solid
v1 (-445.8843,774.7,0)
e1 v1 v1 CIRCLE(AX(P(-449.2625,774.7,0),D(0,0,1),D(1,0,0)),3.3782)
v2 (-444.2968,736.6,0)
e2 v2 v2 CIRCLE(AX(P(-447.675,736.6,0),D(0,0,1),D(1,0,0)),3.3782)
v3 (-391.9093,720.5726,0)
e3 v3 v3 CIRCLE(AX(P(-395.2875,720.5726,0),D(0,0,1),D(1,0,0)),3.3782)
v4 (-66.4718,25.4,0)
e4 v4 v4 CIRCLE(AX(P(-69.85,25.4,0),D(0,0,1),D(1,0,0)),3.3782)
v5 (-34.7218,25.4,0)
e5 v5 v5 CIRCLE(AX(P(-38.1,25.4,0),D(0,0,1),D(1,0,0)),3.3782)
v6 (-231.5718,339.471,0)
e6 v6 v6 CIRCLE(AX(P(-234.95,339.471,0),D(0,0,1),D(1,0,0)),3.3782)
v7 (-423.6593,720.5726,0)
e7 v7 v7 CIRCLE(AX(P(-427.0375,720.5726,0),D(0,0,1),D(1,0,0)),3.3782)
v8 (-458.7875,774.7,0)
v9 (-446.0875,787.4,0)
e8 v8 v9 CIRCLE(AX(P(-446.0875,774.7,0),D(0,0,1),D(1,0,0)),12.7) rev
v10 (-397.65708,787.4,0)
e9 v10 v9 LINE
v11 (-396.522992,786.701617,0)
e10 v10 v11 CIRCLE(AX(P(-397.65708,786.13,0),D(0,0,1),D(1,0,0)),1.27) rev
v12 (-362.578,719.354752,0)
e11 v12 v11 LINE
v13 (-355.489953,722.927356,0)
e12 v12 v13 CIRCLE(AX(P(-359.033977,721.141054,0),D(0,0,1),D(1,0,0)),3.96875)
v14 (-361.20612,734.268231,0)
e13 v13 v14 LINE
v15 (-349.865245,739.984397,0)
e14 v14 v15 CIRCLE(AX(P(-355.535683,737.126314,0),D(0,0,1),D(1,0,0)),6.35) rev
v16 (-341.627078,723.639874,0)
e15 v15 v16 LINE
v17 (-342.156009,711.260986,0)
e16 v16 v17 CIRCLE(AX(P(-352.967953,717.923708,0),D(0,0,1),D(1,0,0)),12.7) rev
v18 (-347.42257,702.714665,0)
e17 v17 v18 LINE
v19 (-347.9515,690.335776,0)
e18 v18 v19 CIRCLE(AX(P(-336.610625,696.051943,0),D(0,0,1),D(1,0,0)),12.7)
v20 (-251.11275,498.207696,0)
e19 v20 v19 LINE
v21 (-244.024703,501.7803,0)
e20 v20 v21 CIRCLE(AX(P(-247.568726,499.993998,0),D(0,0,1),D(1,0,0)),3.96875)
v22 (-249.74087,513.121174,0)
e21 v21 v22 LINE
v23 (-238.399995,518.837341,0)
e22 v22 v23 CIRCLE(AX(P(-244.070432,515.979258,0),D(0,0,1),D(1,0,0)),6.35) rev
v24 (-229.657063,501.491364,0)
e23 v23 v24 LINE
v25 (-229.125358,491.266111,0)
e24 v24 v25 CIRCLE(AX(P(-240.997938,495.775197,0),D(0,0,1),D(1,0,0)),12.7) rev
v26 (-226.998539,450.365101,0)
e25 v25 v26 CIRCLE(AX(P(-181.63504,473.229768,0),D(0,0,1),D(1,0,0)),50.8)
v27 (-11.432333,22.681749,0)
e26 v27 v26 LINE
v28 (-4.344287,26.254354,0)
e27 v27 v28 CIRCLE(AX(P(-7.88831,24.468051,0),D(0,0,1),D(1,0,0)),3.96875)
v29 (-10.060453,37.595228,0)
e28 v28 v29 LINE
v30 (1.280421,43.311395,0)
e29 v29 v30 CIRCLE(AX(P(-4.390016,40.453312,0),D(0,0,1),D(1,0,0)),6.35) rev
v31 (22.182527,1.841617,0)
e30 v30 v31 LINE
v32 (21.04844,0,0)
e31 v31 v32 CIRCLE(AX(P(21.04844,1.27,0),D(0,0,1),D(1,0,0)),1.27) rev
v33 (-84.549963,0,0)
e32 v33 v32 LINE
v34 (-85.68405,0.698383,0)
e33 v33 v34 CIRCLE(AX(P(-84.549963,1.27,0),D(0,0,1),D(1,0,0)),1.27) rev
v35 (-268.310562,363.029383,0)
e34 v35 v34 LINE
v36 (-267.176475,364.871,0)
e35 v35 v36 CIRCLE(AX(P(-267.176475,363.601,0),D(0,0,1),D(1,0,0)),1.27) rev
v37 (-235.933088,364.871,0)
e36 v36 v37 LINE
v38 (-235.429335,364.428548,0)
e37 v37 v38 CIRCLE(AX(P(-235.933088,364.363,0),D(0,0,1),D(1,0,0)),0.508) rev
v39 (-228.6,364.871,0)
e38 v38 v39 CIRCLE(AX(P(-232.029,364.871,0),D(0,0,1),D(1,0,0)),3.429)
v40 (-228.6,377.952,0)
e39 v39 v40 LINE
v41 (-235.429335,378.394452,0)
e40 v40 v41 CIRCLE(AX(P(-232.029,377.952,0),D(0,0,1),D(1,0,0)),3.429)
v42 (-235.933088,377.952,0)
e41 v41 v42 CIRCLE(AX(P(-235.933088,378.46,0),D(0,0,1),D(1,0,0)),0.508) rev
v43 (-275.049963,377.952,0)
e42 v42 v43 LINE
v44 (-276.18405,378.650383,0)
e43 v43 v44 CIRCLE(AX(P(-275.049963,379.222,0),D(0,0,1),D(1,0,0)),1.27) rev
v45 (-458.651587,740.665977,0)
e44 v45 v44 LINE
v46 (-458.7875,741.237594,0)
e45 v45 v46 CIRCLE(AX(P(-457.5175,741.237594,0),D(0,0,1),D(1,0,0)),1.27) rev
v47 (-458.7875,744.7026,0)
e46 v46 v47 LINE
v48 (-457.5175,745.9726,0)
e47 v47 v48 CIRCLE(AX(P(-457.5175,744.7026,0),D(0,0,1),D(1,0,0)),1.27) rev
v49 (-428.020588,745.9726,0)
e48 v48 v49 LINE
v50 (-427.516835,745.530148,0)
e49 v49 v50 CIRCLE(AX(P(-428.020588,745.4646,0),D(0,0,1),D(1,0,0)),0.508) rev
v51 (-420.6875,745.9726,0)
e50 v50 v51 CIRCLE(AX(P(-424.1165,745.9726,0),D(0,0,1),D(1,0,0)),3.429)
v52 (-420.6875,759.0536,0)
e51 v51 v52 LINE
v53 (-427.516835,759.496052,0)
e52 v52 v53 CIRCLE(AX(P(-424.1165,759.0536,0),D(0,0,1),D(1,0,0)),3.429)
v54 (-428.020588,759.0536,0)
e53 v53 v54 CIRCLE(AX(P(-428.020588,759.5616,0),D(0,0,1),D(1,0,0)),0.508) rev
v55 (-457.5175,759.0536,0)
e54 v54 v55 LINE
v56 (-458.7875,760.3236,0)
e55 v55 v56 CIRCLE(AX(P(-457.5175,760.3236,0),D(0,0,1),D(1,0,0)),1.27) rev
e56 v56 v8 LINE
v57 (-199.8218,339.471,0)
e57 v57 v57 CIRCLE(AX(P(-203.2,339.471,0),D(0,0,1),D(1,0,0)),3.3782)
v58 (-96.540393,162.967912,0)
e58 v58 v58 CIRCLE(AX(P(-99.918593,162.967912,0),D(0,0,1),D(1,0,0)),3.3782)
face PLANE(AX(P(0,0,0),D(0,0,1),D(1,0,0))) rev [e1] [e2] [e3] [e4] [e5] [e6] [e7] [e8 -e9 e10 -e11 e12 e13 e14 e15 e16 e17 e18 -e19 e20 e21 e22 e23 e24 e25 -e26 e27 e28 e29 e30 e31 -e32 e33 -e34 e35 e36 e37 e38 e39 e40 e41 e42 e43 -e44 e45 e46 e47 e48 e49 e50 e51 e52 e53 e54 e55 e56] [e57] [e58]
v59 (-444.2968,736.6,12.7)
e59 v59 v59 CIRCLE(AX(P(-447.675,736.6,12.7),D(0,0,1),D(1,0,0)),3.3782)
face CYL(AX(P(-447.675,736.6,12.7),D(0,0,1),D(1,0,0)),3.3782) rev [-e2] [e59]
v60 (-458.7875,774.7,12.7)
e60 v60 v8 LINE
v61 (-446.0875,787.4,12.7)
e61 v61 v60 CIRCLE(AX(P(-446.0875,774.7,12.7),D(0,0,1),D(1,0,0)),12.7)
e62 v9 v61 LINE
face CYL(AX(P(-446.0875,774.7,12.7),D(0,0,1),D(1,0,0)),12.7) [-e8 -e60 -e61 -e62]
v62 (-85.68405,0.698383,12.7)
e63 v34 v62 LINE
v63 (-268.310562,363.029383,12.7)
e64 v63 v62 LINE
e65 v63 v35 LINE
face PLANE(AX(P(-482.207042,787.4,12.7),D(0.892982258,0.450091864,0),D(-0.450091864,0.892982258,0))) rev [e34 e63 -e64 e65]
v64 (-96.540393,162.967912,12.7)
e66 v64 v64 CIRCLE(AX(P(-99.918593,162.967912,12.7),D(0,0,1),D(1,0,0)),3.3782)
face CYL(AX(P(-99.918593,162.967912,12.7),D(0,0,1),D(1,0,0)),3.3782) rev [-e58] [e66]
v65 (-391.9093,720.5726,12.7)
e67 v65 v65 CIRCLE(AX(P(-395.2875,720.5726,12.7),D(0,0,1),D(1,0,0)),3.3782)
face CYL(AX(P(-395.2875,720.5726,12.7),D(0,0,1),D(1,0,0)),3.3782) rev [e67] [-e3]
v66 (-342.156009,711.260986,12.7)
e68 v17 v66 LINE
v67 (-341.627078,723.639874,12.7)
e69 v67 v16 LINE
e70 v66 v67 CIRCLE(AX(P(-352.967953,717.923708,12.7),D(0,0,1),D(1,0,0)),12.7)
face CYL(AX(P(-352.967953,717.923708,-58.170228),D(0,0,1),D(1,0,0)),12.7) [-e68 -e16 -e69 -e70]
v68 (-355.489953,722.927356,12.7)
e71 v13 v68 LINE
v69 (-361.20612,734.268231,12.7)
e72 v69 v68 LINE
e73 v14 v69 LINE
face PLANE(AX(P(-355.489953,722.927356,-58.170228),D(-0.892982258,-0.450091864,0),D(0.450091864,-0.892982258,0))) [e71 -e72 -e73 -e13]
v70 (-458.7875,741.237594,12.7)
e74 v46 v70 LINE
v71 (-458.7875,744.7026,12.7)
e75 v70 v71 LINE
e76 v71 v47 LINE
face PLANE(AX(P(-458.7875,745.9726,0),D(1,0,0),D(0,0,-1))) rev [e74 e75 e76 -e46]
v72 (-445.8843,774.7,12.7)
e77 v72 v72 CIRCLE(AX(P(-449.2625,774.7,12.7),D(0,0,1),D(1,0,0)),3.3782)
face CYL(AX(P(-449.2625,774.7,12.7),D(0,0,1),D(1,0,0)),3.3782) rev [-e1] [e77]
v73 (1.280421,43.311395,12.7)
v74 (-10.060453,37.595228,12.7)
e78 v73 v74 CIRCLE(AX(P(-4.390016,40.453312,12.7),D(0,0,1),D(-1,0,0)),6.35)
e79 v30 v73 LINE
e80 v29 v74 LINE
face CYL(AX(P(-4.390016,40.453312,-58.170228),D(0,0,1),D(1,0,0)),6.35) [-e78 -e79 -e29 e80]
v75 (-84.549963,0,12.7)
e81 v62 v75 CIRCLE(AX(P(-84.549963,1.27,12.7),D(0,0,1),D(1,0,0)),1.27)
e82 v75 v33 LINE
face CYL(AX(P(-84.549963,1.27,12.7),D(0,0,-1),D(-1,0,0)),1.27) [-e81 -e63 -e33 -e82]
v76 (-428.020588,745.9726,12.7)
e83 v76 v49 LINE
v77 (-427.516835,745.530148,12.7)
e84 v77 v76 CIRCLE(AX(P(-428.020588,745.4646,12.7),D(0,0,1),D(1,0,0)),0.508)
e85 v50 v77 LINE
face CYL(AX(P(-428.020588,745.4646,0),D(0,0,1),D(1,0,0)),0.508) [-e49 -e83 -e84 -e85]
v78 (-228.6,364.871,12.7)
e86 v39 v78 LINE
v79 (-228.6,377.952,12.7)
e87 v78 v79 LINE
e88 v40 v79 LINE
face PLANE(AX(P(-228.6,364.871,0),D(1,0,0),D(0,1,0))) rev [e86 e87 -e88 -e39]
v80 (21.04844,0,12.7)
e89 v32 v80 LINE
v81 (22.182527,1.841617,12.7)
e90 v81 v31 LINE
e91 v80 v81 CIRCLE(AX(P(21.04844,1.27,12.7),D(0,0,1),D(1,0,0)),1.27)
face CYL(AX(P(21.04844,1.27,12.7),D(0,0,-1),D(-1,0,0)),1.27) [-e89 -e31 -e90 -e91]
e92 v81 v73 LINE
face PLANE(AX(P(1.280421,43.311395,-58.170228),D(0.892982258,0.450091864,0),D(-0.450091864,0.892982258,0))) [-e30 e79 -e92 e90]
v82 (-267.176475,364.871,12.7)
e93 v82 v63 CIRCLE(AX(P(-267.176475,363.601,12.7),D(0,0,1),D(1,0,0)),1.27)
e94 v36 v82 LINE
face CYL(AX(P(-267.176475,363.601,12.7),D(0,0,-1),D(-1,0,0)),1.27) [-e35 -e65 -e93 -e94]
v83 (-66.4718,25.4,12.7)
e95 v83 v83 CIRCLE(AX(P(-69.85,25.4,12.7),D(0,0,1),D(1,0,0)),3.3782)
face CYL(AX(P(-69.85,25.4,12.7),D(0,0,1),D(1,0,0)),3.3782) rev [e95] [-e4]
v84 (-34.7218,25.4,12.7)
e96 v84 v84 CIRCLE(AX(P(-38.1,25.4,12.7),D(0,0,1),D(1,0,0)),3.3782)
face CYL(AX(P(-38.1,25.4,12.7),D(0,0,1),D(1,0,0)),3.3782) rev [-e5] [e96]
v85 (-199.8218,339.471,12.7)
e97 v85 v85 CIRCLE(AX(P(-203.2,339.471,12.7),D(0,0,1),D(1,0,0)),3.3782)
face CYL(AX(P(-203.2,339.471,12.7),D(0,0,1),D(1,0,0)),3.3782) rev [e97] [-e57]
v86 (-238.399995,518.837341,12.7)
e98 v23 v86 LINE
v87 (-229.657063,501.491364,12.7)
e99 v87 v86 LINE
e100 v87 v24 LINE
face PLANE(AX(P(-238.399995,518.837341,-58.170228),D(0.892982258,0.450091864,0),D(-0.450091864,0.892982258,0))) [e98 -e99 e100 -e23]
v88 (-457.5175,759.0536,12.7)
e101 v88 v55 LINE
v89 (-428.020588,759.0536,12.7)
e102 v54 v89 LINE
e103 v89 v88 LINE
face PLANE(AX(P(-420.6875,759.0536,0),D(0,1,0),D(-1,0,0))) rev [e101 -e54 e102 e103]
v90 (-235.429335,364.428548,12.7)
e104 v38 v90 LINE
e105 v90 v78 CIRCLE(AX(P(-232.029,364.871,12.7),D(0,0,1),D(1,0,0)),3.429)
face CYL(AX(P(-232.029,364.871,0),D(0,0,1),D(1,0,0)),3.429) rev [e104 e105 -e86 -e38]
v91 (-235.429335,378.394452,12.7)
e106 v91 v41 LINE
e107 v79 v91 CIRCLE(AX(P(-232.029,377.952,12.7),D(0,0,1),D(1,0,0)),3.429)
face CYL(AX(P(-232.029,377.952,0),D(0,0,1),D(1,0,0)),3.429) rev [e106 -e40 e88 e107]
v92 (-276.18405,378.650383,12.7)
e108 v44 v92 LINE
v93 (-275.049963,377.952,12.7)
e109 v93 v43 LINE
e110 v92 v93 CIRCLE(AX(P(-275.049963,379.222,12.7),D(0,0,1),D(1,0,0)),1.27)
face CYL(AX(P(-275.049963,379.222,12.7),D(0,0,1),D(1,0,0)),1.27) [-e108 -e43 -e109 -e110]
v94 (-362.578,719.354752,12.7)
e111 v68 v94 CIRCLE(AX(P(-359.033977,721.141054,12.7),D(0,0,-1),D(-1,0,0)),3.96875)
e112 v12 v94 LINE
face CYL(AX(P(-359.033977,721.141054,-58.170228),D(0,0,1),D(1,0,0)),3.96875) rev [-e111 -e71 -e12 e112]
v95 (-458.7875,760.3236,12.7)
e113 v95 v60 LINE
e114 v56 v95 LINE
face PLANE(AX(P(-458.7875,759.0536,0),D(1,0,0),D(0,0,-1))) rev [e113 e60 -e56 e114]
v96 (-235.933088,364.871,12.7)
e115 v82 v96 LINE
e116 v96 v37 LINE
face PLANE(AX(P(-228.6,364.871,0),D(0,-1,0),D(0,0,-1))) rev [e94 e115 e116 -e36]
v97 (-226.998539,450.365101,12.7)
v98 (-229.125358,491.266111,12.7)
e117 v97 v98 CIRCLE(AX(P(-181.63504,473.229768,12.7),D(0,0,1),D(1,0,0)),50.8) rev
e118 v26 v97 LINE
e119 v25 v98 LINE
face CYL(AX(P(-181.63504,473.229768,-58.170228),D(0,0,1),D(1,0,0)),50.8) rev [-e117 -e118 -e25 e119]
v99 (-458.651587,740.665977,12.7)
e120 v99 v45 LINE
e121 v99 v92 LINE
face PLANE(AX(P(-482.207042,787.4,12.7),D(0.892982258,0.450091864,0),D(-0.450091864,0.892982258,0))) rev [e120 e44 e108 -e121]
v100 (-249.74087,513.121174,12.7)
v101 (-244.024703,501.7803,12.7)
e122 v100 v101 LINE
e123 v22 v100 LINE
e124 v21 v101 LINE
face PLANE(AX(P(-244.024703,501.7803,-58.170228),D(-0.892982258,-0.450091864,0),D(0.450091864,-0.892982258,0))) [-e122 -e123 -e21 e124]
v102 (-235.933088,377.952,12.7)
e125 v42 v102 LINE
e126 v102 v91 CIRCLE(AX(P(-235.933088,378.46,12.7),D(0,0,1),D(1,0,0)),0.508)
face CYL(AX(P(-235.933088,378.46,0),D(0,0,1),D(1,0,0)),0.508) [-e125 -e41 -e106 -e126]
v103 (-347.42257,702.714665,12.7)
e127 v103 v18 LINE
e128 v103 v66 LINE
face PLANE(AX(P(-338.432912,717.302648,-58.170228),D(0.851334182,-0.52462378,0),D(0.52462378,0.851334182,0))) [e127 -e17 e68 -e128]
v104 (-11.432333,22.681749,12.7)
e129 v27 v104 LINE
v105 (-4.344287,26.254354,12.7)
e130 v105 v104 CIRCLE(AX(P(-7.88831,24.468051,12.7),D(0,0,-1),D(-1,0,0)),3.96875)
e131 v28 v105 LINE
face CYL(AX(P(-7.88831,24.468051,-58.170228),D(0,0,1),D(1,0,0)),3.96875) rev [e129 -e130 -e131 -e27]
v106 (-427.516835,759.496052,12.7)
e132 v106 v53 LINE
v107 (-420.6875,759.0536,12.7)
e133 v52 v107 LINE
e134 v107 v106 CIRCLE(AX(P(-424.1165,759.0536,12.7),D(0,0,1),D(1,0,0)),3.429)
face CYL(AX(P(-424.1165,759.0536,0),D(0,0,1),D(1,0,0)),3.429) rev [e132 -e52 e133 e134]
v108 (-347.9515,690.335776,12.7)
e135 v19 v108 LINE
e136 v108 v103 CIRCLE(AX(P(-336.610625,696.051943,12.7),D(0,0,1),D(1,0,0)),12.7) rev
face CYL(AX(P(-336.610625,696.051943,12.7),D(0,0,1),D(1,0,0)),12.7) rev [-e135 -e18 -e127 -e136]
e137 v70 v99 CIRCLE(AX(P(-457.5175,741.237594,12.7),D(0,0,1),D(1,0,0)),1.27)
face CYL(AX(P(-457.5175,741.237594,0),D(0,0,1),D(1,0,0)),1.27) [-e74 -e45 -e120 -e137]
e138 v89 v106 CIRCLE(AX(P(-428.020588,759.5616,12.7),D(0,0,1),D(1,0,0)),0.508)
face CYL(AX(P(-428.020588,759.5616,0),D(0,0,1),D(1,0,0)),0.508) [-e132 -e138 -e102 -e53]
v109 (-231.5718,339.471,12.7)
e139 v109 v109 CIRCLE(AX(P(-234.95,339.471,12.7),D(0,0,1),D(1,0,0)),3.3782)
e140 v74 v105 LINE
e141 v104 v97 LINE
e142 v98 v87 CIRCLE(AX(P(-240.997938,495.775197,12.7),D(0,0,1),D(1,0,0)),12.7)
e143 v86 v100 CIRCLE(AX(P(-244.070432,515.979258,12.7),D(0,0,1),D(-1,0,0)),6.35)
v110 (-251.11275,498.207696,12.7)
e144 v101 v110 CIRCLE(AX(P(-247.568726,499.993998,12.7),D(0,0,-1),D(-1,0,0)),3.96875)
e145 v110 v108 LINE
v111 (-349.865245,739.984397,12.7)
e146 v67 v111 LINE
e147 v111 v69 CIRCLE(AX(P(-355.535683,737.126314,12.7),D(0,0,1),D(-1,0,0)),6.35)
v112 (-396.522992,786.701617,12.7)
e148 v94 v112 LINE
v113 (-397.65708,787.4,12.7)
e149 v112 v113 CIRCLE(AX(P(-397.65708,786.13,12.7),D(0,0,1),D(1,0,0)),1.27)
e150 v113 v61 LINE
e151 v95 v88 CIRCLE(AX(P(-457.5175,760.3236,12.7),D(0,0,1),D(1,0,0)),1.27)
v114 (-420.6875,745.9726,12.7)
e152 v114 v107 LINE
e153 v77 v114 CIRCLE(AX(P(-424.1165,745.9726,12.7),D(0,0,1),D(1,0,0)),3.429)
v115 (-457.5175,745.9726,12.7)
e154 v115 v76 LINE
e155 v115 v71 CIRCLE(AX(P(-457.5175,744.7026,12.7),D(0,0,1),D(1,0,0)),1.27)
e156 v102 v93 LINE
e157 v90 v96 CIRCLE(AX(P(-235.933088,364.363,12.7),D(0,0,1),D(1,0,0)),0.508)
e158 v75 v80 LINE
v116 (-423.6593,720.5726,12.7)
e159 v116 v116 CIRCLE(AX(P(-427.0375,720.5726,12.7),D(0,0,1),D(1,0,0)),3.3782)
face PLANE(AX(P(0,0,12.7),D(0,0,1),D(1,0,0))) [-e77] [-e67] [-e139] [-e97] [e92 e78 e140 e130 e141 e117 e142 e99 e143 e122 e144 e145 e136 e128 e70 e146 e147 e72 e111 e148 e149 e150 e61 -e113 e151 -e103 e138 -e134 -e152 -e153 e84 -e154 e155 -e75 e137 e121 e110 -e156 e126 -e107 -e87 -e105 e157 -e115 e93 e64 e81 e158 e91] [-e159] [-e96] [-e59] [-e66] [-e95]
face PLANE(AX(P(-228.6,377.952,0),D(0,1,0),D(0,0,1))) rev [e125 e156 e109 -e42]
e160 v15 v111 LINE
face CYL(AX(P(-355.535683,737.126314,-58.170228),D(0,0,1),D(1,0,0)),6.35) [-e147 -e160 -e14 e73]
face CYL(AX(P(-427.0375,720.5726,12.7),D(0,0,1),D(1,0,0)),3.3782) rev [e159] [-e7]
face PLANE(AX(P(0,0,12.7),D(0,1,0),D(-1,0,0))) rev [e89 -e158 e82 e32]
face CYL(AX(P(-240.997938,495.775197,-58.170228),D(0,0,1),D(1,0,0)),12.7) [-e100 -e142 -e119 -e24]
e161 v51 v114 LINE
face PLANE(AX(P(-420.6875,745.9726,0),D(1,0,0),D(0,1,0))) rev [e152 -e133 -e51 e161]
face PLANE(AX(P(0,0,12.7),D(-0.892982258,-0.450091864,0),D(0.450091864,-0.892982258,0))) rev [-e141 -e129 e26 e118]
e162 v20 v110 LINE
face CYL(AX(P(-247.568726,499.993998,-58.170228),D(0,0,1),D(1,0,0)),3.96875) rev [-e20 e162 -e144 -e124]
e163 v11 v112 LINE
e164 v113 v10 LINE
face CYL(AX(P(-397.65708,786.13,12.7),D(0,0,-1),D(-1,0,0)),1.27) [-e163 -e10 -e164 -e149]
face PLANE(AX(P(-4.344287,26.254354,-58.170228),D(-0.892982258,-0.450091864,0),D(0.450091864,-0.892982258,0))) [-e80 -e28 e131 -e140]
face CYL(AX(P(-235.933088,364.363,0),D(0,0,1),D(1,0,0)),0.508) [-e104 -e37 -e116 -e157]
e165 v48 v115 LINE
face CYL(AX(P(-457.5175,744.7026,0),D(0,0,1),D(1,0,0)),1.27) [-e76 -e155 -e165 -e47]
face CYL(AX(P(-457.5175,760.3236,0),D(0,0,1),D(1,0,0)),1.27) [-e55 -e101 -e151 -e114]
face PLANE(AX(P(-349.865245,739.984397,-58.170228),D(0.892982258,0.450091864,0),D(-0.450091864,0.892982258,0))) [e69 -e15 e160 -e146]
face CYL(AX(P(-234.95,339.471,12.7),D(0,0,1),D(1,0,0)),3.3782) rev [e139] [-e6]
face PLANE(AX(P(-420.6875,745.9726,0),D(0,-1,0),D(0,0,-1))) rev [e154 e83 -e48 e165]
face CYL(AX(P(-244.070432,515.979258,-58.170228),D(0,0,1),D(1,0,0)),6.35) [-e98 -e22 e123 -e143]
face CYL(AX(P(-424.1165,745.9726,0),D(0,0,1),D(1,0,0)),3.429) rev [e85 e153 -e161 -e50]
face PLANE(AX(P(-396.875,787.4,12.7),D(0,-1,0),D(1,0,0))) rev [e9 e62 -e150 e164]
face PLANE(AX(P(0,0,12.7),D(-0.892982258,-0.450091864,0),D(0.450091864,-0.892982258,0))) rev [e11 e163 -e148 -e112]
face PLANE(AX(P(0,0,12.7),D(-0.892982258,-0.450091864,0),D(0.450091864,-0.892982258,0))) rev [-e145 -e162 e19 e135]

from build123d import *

# Parameters (mm, degrees)
BOSS_EXTRUDE1_DEPTH     = 12.7
SKETCH3_W               = 47.23204247
SKETCH3_H               = 13.081
CUT_EXTRUDE1_DEPTH      = 924.408729549
BOSS_EXTRUDE3_DEPTH     = 12.7
F_1_4_CLEARANCE_HOLE1_D = 6.7564
SKETCH13_W              = 23.41954247
SKETCH13_H              = 28.3464
CUT_EXTRUDE2_DEPTH      = 924.408729549
SKETCH14_R              = 3.429
CUT_EXTRUDE3_DEPTH      = 913.678476707
FILLET4_R               = 50.8
FILLET5_R               = 12.7
FILLET6_R               = 1.27
FILLET7_R               = 0.508
F_1_4_CLEARANCE_HOLE2_D = 6.7564
CUT_EXTRUDE4_DEPTH      = 913.678476707
FILLET8_R               = 1.27


with BuildPart() as part:
    # Sketch1 → Boss-Extrude1 (new body)
    with BuildSketch(Plane.XY):
        Polygon((0, 0), (-396.875, 787.4), (-482.20704247, 787.4), (-85.33204247, 0), align=None)
    extrude(amount=BOSS_EXTRUDE1_DEPTH)

    # Sketch3 → Cut-Extrude1 (cut, through all)
    with BuildSketch(Plane.XY.offset(12.7)):
        with Locations((-252.216021235, 371.4115)):
            Rectangle(SKETCH3_W, SKETCH3_H)
        with Locations((-444.303521235, 752.5131)):
            Rectangle(SKETCH3_W, SKETCH3_H)
    extrude(amount=-CUT_EXTRUDE1_DEPTH, mode=Mode.SUBTRACT)

    # Sketch10 → Boss-Extrude3 (add)
    with BuildSketch(Plane.XY.offset(12.7)):
        with BuildLine():
            Line((-244.024703128, 501.780299783), (-249.740869802, 513.121174464))
            ThreePointArc((-249.740869802, 513.121174464), (-246.928515798, 521.649695143), (-238.39999512, 518.837341139))
            Line((-238.39999512, 518.837341139), (-226.967661771, 496.155591775))
            Line((-226.967661771, 496.155591775), (-239.680416455, 475.525946247))
            Line((-239.680416455, 475.525946247), (-251.112749804, 498.207695611))
            ThreePointArc((-251.112749804, 498.207695611), (-245.78242438, 496.449974359), (-244.024703128, 501.780299783))
        make_face()
        with BuildLine():
            Line((-351.145666605, 696.673002545), (-362.577999954, 719.354751908))
            ThreePointArc((-362.577999954, 719.354751908), (-357.24767453, 717.597030656), (-355.489953278, 722.92735608))
            Line((-355.489953278, 722.92735608), (-361.206119952, 734.268230762))
            ThreePointArc((-361.206119952, 734.268230762), (-358.393765948, 742.79675144), (-349.86524527, 739.984397436))
            Line((-349.86524527, 739.984397436), (-338.432911921, 717.302648072))
            Line((-338.432911921, 717.302648072), (-351.145666605, 696.673002545))
        make_face()
        with BuildLine():
            Line((0, 0), (-11.432333349, 22.681749364))
            ThreePointArc((-11.432333349, 22.681749364), (-6.102007925, 20.924028111), (-4.344286673, 26.254353535))
            Line((-4.344286673, 26.254353535), (-10.060453347, 37.595228217))
            ThreePointArc((-10.060453347, 37.595228217), (-7.248099343, 46.123748895), (1.280421335, 43.311394892))
            Line((1.280421335, 43.311394892), (12.712754684, 20.629645528))
            Line((12.712754684, 20.629645528), (23.110761502, 0))
            Line((23.110761502, 0), (0, 0))
        make_face()
    extrude(amount=-BOSS_EXTRUDE3_DEPTH)

    # 1/4 Clearance Hole1 (through all)
    with Locations(Plane.XY.offset(12.7)):
        with Locations((-99.918593468, 162.967911886), (-427.0375, 720.5726), (-395.2875, 720.5726), (-203.2, 339.471), (-234.95, 339.471), (-69.85, 25.4), (-38.1, 25.4)):
            Hole(F_1_4_CLEARANCE_HOLE1_D / 2)

    # Sketch13 → Cut-Extrude2 (cut, through all)
    with BuildSketch(Plane.XY.offset(12.7)):
        with Locations((-470.497271235, 773.2268)):
            Rectangle(SKETCH13_W, SKETCH13_H)
    extrude(amount=-CUT_EXTRUDE2_DEPTH, mode=Mode.SUBTRACT)

    # Sketch14 → Cut-Extrude3 (cut, through all)
    with BuildSketch(Plane.XY.offset(12.7)):
        with Locations((-424.1165, 759.0536)):
            Circle(SKETCH14_R)
        with Locations((-424.1165, 745.9726)):
            Circle(SKETCH14_R)
        with Locations((-232.029, 377.952)):
            Circle(SKETCH14_R)
        with Locations((-232.029, 364.871)):
            Circle(SKETCH14_R)
    extrude(amount=-CUT_EXTRUDE3_DEPTH, mode=Mode.SUBTRACT)

    # Fillet4
    # the kernel refuses this fillet: 50.8 mm, written as the material it adds along each edge
    with BuildSketch(Plane(origin=(-239.680416455, 475.525946247, 12.7), x_dir=(0.45009186412240076, -0.8929822584188458, 0), z_dir=(0, 0, -1))) as fillet4_piece_1:
        with BuildLine():
            CenterArc((28.176198377, -50.8), FILLET4_R, 90, 53.576426358)
            Line((-12.7, -20.6375), (-13.517523968, -20.03425))
            ThreePointArc((-13.517523968, -20.03425), (-7.21528485, -9.786267016), (-0.86528485, 0.532482984))
            Line((-0.86528485, 0.532482984), (0, 1.016))
            Line((0, 1.016), (28.176198377, 1.016))
            Line((28.176198377, 1.016), (28.176198377, 0))
        make_face()
    extrude(amount=12.7)

    # Fillet5
    fillet5_edges = [part.edges().sort_by_distance(p)[0] for p in [
        (-458.7875, 787.4, 6.35),
        (-226.967661771, 496.155591775, 6.35),
        (-338.432911921, 717.302648072, 6.35),
        (-351.145666605, 696.673002545, 6.35),
    ]]
    fillet(fillet5_edges, radius=FILLET5_R)

    # Fillet6
    fillet6_edges = [part.edges().sort_by_distance(p)[0] for p in [
        (-458.7875, 759.0536, 6.35),
        (-269.238796502, 364.871, 6.35),
        (-275.83204247, 377.952, 6.35),
    ]]
    fillet(fillet6_edges, radius=FILLET6_R)

    # Fillet7
    fillet7_edges = [part.edges().sort_by_distance(p)[0] for p in [
        (-235.458, 377.952, 6.35),
        (-427.5455, 759.0536, 6.35),
        (-427.5455, 745.9726, 6.35),
        (-235.458, 364.871, 6.35),
    ]]
    fillet(fillet7_edges, radius=FILLET7_R)

    # 1/4 Clearance Hole2 (through all)
    with Locations(Plane.XY.offset(12.7)):
        with Locations((-447.675, 736.6), (-449.2625, 774.7)):
            Hole(F_1_4_CLEARANCE_HOLE2_D / 2)

    # Sketch18 → Cut-Extrude4 (cut, through all)
    with BuildSketch(Plane.XY.offset(12.7)):
        Polygon((-458.7875, 745.9726), (-458.7875, 740.93562774), (-461.326296502, 745.9726), align=None)
    extrude(amount=-CUT_EXTRUDE4_DEPTH, mode=Mode.SUBTRACT)

    # Fillet8
    fillet8_edges = [part.edges().sort_by_distance(p)[0] for p in [
        (-458.7875, 745.9726, 6.35),
        (-458.7875, 740.93562774, 6.35),
        (-85.33204247, 0, 6.35),
        (23.110761502, 0, 6.35),
        (-396.875, 787.4, 6.35),
    ]]
    fillet(fillet8_edges, radius=FILLET8_R)


solid = part.part
